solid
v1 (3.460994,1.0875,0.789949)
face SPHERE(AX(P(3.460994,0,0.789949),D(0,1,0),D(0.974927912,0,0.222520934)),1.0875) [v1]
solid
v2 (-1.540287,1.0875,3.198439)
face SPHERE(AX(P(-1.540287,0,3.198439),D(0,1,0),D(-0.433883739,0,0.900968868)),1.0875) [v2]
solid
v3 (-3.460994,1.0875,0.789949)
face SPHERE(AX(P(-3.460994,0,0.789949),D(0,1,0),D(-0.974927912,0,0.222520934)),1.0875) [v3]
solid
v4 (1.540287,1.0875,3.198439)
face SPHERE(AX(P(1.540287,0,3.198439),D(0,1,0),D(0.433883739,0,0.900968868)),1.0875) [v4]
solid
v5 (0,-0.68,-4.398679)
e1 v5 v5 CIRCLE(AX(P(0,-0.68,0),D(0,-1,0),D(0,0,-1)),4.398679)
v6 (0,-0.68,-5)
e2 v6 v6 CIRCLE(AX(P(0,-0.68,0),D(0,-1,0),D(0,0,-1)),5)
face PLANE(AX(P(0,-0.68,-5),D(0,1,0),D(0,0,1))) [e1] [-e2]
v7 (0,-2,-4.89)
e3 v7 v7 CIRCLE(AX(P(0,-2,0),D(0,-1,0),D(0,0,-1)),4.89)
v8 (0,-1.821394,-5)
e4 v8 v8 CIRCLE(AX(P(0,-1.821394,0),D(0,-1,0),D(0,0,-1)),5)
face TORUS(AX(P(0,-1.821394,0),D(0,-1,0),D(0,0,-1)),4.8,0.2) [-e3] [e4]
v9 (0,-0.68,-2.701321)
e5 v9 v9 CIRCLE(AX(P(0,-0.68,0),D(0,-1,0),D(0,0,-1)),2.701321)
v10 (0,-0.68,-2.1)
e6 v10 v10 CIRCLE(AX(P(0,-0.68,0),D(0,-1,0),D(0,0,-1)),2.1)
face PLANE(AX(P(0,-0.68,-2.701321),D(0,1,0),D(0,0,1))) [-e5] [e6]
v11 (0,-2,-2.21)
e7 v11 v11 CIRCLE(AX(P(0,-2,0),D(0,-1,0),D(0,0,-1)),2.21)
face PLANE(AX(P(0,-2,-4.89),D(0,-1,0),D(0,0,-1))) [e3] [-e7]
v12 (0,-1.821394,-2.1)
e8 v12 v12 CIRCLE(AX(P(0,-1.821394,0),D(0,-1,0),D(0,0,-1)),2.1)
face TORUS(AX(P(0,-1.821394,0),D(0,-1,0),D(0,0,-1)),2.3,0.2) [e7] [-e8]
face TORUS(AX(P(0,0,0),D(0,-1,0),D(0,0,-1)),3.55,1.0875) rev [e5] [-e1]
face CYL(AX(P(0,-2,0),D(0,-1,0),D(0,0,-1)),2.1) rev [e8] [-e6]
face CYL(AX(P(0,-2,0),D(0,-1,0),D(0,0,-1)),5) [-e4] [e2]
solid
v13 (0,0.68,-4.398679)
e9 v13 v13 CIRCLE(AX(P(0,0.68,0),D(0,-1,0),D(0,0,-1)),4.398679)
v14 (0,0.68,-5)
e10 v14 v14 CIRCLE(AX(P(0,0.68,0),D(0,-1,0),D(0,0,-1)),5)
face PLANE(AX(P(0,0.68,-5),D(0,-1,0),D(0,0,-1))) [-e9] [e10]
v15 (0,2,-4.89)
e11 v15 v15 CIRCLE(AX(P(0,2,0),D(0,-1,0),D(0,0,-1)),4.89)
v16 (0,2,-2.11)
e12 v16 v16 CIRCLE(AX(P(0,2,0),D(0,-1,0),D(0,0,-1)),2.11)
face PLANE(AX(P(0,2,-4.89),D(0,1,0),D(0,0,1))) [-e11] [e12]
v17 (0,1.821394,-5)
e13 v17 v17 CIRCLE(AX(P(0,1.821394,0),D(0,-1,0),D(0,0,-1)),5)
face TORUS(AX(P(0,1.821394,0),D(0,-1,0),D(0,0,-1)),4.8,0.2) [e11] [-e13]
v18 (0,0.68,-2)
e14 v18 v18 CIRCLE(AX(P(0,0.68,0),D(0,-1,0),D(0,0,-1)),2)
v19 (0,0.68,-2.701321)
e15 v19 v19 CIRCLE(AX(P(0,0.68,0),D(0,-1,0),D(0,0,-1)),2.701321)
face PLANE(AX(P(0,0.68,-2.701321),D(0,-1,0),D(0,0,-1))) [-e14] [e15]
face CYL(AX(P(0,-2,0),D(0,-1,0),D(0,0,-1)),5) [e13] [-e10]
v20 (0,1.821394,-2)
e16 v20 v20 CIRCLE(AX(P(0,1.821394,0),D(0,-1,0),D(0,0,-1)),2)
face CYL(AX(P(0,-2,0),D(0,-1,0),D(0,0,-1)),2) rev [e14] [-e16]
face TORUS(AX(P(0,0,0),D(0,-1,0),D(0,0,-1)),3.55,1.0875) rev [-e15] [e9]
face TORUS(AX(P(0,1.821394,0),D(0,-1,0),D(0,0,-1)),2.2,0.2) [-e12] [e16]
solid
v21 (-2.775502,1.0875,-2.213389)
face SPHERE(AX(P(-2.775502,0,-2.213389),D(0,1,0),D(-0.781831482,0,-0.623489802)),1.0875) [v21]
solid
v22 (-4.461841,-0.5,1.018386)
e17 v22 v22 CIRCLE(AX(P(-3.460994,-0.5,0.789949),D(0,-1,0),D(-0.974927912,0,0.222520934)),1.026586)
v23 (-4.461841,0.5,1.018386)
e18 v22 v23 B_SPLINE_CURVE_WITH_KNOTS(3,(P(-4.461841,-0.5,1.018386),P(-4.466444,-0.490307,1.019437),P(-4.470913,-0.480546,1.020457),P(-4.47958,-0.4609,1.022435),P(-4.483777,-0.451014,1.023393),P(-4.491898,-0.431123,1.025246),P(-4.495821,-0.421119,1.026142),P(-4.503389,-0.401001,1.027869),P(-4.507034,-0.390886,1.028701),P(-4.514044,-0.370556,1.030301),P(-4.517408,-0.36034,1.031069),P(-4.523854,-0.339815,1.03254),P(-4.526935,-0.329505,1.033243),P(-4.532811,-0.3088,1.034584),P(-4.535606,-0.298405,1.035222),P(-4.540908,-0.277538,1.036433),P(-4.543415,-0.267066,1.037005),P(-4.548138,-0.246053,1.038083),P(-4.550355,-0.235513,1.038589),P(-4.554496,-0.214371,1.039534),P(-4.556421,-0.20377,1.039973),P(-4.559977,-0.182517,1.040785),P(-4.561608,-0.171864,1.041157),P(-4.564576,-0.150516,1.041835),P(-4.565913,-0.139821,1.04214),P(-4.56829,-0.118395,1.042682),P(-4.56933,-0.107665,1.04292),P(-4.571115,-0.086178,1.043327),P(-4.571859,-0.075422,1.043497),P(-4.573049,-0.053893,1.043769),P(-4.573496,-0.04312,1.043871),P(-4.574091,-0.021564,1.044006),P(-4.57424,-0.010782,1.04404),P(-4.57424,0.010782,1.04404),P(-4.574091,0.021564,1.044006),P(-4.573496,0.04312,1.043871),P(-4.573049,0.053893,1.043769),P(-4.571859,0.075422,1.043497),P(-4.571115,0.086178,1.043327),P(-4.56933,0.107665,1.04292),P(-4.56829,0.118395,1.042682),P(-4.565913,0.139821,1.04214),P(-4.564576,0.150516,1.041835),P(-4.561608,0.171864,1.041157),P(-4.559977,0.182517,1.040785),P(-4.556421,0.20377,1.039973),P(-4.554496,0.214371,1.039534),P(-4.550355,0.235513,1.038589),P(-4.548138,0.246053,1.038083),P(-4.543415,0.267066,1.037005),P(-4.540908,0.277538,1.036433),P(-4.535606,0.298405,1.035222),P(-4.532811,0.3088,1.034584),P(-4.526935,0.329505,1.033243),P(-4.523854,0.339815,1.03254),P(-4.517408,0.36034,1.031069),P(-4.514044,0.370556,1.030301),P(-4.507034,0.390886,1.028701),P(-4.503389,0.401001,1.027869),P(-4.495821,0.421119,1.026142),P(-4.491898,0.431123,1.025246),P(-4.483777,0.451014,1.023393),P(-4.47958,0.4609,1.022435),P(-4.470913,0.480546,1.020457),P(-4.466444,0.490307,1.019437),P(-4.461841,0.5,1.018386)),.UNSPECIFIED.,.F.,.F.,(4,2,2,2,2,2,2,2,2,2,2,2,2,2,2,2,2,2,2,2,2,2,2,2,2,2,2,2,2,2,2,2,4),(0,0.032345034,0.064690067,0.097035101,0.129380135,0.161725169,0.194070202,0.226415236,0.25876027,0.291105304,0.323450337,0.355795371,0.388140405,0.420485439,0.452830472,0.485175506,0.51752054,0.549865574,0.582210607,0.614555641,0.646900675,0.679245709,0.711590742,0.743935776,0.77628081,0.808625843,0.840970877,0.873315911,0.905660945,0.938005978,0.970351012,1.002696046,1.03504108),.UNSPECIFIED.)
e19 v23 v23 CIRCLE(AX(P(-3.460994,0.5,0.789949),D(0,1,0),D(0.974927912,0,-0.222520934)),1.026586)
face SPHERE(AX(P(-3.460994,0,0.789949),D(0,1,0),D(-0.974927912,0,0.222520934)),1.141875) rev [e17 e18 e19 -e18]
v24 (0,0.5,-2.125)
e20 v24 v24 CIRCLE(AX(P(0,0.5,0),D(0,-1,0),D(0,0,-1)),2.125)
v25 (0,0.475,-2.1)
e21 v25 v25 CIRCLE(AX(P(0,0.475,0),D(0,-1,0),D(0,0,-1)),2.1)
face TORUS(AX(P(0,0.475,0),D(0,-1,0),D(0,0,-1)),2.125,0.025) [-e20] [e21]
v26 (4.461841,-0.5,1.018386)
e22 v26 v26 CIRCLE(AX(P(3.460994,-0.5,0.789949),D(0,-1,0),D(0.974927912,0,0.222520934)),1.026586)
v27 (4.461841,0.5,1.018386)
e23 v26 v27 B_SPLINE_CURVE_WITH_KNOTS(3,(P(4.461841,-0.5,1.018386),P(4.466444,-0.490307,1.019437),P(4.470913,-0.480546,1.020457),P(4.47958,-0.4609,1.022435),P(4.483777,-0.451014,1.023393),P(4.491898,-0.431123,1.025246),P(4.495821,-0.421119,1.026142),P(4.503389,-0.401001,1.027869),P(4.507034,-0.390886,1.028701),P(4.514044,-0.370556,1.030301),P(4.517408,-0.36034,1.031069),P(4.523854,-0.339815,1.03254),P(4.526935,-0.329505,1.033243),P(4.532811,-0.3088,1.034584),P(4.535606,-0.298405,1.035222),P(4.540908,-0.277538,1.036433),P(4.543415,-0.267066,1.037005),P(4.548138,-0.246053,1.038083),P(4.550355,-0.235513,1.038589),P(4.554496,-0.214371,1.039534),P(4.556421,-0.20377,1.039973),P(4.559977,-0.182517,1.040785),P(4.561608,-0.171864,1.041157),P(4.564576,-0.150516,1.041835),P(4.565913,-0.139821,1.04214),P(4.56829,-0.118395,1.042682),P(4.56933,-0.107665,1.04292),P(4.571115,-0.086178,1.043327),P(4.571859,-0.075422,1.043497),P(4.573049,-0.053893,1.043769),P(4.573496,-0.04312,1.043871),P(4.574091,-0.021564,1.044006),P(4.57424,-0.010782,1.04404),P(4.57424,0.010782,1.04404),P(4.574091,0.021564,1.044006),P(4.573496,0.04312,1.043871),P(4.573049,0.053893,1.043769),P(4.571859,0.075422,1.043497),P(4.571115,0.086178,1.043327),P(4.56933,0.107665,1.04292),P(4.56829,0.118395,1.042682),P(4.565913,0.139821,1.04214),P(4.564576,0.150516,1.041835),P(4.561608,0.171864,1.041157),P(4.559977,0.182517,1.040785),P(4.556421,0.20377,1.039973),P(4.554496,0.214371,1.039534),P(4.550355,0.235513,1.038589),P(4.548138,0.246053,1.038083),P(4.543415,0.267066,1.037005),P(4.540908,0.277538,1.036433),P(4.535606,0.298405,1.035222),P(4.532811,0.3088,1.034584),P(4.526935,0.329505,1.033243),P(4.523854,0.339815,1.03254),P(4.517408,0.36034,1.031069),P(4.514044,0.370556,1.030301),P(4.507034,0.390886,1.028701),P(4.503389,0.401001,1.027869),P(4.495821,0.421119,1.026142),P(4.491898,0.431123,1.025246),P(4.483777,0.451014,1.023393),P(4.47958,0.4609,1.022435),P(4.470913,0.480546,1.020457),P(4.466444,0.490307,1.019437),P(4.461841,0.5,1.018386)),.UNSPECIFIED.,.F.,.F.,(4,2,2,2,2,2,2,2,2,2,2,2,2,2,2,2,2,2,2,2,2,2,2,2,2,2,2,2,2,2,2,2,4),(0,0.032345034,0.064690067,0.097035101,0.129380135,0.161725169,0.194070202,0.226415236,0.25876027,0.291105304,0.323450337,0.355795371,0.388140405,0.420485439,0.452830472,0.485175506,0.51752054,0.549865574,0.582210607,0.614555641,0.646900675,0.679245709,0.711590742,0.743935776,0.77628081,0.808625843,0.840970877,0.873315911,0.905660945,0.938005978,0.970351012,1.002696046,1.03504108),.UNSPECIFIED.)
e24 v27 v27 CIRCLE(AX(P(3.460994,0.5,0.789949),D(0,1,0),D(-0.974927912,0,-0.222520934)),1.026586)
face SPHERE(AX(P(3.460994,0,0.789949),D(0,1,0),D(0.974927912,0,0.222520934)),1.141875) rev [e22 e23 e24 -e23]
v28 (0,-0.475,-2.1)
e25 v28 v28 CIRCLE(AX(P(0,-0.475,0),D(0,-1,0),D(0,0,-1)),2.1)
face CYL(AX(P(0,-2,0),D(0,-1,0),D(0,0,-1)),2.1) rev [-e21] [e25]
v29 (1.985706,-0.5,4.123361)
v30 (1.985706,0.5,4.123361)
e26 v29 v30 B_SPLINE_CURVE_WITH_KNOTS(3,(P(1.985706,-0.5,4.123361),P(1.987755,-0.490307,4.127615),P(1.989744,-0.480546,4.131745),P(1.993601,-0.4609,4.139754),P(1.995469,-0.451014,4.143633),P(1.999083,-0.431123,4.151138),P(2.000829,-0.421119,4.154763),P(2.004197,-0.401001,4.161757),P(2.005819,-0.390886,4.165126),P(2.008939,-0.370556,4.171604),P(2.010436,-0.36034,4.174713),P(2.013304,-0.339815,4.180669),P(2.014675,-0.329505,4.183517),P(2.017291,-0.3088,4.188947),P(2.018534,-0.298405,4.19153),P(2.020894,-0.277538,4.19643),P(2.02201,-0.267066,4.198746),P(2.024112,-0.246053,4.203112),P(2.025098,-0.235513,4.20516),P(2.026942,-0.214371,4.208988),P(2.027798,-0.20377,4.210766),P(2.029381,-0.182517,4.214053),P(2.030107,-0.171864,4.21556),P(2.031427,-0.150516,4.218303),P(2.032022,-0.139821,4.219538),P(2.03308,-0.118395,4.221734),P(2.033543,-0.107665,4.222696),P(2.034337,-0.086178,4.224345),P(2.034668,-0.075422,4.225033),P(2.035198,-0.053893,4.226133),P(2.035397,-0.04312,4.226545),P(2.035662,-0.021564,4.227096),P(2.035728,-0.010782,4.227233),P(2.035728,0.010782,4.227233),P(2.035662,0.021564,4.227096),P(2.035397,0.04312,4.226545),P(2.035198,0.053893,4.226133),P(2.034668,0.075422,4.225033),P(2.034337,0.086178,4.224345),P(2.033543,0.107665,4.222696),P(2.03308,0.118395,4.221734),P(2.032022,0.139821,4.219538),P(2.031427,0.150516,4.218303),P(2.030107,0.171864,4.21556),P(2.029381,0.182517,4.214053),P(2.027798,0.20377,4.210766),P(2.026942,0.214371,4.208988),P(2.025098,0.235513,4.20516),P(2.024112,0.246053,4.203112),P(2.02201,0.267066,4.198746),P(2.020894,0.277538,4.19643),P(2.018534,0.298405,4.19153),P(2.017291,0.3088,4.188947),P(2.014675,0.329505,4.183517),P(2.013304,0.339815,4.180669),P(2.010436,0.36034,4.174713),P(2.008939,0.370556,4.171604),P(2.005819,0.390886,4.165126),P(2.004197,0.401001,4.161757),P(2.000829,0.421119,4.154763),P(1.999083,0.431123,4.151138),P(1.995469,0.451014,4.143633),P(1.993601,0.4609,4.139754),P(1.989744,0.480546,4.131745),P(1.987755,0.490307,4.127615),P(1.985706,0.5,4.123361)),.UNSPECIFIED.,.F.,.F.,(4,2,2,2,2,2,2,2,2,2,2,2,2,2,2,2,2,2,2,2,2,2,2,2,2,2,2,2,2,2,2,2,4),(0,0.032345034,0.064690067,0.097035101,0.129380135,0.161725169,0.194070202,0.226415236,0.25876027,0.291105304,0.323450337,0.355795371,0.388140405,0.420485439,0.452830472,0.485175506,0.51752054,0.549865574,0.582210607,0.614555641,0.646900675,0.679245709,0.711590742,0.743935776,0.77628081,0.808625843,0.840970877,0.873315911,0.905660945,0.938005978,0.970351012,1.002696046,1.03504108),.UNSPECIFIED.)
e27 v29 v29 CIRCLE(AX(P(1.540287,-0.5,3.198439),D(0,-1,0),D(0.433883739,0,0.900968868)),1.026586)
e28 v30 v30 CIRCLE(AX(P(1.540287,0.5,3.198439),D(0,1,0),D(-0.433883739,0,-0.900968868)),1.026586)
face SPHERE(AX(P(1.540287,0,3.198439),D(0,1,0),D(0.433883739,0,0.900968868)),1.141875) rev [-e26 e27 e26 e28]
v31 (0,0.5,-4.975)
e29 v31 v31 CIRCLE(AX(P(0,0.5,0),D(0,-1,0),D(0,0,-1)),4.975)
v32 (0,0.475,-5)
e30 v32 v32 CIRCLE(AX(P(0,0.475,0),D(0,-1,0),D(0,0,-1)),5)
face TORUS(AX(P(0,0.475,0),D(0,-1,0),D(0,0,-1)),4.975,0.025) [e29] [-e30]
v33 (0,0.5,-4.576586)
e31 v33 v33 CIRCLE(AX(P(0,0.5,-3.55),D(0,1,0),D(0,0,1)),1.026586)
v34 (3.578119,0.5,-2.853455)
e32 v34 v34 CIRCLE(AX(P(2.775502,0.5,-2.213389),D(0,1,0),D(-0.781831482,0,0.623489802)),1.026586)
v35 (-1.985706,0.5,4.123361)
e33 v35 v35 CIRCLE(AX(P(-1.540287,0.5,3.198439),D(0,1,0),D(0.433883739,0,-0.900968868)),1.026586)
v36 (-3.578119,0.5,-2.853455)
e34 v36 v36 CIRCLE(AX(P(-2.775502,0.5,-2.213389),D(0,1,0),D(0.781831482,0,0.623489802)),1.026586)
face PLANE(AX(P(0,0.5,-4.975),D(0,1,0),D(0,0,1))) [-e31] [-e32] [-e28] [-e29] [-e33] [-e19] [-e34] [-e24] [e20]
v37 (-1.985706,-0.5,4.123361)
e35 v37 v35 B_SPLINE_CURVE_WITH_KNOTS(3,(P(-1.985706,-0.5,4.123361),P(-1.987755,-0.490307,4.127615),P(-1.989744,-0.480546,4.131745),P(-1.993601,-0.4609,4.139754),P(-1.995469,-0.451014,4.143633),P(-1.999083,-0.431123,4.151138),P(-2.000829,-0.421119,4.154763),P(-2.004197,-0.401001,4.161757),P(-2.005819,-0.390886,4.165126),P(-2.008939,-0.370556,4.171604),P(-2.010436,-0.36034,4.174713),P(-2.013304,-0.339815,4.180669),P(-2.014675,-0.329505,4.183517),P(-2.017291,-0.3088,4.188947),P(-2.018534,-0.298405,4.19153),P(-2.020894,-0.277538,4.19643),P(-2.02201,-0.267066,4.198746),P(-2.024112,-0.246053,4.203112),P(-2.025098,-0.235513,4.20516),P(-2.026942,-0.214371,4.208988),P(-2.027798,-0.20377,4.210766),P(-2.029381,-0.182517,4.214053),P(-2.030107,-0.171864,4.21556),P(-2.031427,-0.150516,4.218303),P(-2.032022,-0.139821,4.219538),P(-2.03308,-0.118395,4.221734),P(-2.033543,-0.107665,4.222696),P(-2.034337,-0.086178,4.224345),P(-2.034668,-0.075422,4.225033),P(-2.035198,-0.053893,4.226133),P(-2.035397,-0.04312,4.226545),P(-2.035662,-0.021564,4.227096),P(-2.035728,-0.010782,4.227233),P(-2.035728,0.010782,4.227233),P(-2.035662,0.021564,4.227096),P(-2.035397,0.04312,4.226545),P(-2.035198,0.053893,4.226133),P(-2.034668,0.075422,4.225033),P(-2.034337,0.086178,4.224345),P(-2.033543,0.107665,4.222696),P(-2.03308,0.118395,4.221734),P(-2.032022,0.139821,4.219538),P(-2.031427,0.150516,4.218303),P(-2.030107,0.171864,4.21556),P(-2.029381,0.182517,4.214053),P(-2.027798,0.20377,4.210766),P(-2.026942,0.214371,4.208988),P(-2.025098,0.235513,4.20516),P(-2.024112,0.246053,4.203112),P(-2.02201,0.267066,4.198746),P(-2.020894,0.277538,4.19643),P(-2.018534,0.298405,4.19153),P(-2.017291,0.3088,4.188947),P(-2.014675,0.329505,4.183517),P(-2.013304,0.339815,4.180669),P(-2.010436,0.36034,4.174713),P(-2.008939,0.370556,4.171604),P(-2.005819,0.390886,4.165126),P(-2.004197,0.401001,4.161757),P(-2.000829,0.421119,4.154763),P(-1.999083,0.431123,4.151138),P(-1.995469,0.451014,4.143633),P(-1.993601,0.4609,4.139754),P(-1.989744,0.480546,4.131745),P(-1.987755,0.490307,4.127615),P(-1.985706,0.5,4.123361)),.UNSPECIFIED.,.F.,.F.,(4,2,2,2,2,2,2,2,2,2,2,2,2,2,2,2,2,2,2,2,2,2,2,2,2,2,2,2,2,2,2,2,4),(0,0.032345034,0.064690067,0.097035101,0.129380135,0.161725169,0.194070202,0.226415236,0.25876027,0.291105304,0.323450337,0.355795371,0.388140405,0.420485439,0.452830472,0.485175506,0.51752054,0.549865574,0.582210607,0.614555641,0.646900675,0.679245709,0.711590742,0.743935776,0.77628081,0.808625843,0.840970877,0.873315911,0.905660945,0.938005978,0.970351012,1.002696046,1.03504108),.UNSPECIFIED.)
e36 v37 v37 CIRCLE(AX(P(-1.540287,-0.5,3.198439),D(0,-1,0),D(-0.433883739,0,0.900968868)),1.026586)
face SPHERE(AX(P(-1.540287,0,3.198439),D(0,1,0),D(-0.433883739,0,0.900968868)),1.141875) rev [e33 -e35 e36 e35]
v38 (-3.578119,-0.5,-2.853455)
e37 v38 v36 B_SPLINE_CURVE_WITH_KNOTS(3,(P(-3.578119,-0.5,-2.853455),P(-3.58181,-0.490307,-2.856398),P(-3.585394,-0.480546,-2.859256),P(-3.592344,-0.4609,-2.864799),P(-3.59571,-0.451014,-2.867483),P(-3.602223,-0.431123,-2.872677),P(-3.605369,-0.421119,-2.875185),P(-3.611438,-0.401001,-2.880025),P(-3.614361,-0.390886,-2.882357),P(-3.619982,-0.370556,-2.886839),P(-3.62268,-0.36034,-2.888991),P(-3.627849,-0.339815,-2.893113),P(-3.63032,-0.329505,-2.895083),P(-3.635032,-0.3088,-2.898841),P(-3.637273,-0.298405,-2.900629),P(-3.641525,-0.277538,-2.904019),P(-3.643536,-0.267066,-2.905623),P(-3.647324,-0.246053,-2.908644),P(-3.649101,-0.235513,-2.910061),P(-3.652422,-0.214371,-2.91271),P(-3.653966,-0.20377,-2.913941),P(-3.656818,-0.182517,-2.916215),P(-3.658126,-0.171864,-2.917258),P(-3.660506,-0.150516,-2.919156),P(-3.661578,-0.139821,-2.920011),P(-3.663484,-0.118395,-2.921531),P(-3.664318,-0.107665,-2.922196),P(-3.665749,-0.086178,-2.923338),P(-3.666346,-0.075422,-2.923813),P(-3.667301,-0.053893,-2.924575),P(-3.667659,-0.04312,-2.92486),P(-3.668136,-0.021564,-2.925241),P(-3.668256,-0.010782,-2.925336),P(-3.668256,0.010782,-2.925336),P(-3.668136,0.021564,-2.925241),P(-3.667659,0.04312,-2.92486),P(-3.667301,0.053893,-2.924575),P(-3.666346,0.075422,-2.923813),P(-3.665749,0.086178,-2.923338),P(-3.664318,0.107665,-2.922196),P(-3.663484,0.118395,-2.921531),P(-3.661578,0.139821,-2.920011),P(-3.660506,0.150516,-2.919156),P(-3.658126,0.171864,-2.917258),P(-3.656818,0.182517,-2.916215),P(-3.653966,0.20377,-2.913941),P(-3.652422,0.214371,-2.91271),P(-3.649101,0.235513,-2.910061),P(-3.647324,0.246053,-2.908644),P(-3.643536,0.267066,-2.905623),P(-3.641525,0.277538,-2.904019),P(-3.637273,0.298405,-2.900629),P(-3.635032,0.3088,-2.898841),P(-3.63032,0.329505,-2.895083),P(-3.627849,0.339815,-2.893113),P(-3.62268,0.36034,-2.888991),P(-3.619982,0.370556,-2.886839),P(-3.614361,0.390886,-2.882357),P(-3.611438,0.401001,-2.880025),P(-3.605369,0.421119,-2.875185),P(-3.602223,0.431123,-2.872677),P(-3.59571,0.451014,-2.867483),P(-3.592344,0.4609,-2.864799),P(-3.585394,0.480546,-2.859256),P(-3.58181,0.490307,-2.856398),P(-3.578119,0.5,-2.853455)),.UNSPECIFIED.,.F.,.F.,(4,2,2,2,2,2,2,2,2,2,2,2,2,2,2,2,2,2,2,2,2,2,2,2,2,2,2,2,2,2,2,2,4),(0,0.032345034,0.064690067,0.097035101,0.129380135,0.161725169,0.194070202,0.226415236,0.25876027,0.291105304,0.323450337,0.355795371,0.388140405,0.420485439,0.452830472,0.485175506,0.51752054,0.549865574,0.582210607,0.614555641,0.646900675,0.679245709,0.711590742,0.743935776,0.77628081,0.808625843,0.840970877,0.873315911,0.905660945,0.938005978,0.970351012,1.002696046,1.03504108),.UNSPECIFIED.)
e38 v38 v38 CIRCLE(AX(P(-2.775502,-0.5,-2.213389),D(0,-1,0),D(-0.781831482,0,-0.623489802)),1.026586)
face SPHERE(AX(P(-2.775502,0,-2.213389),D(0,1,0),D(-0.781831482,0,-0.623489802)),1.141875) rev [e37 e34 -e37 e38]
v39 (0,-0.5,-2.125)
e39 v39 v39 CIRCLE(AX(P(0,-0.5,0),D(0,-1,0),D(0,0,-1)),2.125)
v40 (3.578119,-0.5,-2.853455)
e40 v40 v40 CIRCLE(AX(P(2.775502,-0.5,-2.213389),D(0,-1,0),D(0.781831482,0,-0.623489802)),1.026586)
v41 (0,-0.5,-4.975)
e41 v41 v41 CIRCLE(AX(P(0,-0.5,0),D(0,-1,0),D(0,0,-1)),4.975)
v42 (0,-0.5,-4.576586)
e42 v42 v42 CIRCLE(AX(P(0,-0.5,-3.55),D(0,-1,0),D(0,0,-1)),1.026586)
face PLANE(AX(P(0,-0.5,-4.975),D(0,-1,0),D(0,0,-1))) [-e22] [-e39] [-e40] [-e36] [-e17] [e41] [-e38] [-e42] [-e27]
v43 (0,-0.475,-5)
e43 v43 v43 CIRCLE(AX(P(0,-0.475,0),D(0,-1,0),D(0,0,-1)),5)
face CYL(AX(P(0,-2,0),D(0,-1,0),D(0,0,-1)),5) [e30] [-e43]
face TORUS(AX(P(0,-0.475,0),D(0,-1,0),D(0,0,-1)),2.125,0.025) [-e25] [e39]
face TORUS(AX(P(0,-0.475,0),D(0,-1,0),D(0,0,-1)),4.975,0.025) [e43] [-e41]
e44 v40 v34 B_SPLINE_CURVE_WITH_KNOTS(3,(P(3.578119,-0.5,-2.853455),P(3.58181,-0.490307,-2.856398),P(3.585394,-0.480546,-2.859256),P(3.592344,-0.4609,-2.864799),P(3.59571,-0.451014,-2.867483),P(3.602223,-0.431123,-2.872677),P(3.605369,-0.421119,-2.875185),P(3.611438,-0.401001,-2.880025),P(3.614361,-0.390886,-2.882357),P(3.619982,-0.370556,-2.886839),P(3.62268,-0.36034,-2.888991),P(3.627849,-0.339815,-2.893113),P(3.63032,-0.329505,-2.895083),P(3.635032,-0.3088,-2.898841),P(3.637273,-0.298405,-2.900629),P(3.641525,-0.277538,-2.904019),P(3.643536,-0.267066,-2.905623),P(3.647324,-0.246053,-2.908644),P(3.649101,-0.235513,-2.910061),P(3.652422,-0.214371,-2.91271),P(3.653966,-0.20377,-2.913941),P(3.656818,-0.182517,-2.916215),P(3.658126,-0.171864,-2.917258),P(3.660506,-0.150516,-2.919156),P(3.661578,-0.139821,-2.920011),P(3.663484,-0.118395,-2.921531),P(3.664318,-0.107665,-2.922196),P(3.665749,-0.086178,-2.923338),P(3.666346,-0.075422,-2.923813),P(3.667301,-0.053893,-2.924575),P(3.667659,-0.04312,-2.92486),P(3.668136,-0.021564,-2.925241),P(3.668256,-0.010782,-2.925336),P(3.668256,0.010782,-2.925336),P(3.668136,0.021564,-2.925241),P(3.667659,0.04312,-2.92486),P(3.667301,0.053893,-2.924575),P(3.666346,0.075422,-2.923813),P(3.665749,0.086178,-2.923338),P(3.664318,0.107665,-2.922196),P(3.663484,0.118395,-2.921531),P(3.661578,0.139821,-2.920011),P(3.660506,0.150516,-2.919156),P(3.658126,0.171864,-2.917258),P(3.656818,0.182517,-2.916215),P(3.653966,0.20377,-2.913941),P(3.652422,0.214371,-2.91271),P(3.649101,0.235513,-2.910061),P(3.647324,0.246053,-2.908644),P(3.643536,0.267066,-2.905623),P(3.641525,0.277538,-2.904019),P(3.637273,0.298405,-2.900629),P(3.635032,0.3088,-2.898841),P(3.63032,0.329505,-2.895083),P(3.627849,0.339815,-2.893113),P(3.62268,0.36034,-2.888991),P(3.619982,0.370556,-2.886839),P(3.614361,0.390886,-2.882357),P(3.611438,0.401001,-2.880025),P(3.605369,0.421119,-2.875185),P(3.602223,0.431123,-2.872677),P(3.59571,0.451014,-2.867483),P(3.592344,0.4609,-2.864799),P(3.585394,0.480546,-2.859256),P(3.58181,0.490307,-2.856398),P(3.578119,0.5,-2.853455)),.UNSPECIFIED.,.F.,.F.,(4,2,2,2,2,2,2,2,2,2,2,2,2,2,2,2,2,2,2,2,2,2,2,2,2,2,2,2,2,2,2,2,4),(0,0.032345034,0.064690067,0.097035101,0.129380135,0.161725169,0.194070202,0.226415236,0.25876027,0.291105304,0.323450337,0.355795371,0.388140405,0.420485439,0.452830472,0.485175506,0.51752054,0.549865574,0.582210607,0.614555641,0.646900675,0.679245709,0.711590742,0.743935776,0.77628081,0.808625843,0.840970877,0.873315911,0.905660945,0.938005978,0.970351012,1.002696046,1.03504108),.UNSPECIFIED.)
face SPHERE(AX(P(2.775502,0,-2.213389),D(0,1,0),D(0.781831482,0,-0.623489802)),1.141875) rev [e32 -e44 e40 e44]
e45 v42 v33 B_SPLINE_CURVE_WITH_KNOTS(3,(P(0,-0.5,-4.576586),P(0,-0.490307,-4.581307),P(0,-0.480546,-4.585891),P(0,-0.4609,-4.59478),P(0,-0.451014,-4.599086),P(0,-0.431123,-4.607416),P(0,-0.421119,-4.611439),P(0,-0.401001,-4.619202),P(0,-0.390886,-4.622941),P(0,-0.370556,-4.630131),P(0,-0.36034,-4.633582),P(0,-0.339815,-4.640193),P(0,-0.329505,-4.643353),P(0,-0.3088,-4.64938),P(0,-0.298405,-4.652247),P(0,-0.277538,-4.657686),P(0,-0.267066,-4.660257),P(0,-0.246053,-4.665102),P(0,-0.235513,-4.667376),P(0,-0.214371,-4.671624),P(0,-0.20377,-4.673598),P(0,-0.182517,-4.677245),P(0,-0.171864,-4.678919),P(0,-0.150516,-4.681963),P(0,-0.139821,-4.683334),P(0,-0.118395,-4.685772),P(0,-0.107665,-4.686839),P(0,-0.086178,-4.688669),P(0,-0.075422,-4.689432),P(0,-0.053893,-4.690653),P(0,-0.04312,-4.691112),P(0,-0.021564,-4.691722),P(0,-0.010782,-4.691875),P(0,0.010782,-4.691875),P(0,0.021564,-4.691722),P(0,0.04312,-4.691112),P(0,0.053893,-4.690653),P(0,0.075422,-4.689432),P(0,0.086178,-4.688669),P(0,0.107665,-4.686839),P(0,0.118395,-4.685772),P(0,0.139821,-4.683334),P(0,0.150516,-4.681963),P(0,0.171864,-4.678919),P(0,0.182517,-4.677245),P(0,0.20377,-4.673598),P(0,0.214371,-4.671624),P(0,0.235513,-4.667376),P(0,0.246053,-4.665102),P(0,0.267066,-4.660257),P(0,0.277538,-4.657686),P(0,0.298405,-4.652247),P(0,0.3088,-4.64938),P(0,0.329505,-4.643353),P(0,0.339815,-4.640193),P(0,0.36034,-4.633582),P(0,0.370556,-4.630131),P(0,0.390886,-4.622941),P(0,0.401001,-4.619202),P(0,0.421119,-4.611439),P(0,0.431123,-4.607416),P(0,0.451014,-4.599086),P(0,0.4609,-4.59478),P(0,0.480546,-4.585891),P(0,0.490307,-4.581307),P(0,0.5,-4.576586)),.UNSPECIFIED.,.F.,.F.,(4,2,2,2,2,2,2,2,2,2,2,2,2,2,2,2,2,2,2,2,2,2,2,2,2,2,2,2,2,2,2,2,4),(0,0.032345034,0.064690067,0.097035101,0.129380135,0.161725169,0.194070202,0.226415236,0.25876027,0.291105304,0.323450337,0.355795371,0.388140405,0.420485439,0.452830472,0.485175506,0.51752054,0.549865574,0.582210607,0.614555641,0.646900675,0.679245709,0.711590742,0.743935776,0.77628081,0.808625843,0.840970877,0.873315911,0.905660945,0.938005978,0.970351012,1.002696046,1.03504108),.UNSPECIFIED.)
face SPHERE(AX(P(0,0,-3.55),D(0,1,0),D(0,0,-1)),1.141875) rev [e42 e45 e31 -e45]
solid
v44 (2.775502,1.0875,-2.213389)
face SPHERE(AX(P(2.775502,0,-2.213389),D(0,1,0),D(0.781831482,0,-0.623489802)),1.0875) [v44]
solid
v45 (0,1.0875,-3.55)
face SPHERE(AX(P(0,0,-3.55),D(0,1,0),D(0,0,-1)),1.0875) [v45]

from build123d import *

# Parameters (mm, degrees)
CIRPATTERN1_COUNT = 7
CIRPATTERN2_COUNT = 7


# Read off the part's stored shape, not the designer's step: Cut-Revolve1
with BuildPart() as part:
    # Sketch3 → Revolve1 (revolve)
    with BuildSketch(Plane(origin=(0, 0, 0), x_dir=(0, 0, -1), z_dir=(1, 0, 0))):
        with BuildLine():
            Line((5, 0.68), (4.398679121, 0.68))
            ThreePointArc((4.398679121, 0.68), (3.55, 1.0875), (2.701320879, 0.68))
            Line((2.701320879, 0.68), (2, 0.68))
            Line((2, 0.68), (2, 1.821394289))
            ThreePointArc((2, 1.821394289), (2.029706136, 1.926275174), (2.11, 2))
            Line((2.11, 2), (4.89, 2))
            ThreePointArc((4.89, 2), (4.970293864, 1.926275174), (5, 1.821394289))
            Line((5, 1.821394289), (5, 0.68))
        make_face()
        with BuildLine():
            Line((2.701320879, -0.68), (2.1, -0.68))
            Line((2.1, -0.68), (2.1, -1.821394289))
            ThreePointArc((2.1, -1.821394289), (2.129706136, -1.926275174), (2.21, -2))
            Line((2.21, -2), (4.89, -2))
            ThreePointArc((4.89, -2), (4.970293864, -1.926275174), (5, -1.821394289))
            Line((5, -1.821394289), (5, -0.68))
            Line((5, -0.68), (4.398679121, -0.68))
            ThreePointArc((4.398679121, -0.68), (3.55, -1.0875), (2.701320879, -0.68))
        make_face()
        with BuildLine():
            Line((4.975, 0.5), (2.125, 0.5))
            ThreePointArc((2.125, 0.5), (2.10732233, 0.49267767), (2.1, 0.475))
            Line((2.1, 0.475), (2.1, -0.475))
            ThreePointArc((2.1, -0.475), (2.10732233, -0.49267767), (2.125, -0.5))
            Line((2.125, -0.5), (4.975, -0.5))
            ThreePointArc((4.975, -0.5), (4.99267767, -0.49267767), (5, -0.475))
            Line((5, -0.475), (5, 0.475))
            ThreePointArc((5, 0.475), (4.99267767, 0.49267767), (4.975, 0.5))
        make_face()
    revolve(axis=Axis((0, -2, 0), (0, 1, 0)))

    # Cut-Revolve1 outline → Cut-Revolve1 (revolve, cut)
    with BuildSketch(Plane.XY.offset(-3.55)):
        with BuildLine():
            Line((1.026585853, 0.500000001), (0, 0.500000001))
            Line((0, 0.500000001), (0, -0.500000001))
            Line((0, -0.500000001), (1.026585853, -0.500000001))
            ThreePointArc((1.026585853, -0.500000001), (1.141875, 0), (1.026585853, 0.500000001))
        make_face()
    cut_revolve1 = revolve(axis=Axis((0, 0, -3.55), (0, 1, 0)), mode=Mode.SUBTRACT)

    # CirPattern2: Cut-Revolve1 ×7 about axis
    cirpattern2_axis = Axis((0, 0, 0), (0, 1, 0))
    for i in range(1, CIRPATTERN2_COUNT):
        add(cut_revolve1.rotate(cirpattern2_axis, i * 360 / CIRPATTERN2_COUNT), mode=Mode.SUBTRACT)


with BuildPart() as body_2:
    # Sketch4 → Revolve2 (revolve)
    with BuildSketch(Plane(origin=(0, 0, 0), x_dir=(0, 0, -1), z_dir=(1, 0, 0))):
        with BuildLine():
            Line((3.55, -1.0875), (3.55, 1.0875))
            ThreePointArc((3.55, 1.0875), (2.4625, 0), (3.55, -1.0875))
        make_face()
    revolve(axis=Axis((0, 2, -3.55), (0, -1, 0)))


with BuildPart() as cirpattern1_1:
    # CirPattern1: pattern copy
    add(body_2.part.rotate(Axis((0, 0, 0), (0, 1, 0)), 1 * 360 / CIRPATTERN1_COUNT))


with BuildPart() as cirpattern1_2:
    # CirPattern1: pattern copy
    add(body_2.part.rotate(Axis((0, 0, 0), (0, 1, 0)), 2 * 360 / CIRPATTERN1_COUNT))


with BuildPart() as cirpattern1_3:
    # CirPattern1: pattern copy
    add(body_2.part.rotate(Axis((0, 0, 0), (0, 1, 0)), 3 * 360 / CIRPATTERN1_COUNT))


with BuildPart() as cirpattern1_4:
    # CirPattern1: pattern copy
    add(body_2.part.rotate(Axis((0, 0, 0), (0, 1, 0)), 4 * 360 / CIRPATTERN1_COUNT))


with BuildPart() as cirpattern1_5:
    # CirPattern1: pattern copy
    add(body_2.part.rotate(Axis((0, 0, 0), (0, 1, 0)), 5 * 360 / CIRPATTERN1_COUNT))


with BuildPart() as cirpattern1_6:
    # CirPattern1: pattern copy
    add(body_2.part.rotate(Axis((0, 0, 0), (0, 1, 0)), 6 * 360 / CIRPATTERN1_COUNT))


solid = Compound([part.part, body_2.part, cirpattern1_1.part, cirpattern1_2.part, cirpattern1_3.part, cirpattern1_4.part, cirpattern1_5.part, cirpattern1_6.part])
